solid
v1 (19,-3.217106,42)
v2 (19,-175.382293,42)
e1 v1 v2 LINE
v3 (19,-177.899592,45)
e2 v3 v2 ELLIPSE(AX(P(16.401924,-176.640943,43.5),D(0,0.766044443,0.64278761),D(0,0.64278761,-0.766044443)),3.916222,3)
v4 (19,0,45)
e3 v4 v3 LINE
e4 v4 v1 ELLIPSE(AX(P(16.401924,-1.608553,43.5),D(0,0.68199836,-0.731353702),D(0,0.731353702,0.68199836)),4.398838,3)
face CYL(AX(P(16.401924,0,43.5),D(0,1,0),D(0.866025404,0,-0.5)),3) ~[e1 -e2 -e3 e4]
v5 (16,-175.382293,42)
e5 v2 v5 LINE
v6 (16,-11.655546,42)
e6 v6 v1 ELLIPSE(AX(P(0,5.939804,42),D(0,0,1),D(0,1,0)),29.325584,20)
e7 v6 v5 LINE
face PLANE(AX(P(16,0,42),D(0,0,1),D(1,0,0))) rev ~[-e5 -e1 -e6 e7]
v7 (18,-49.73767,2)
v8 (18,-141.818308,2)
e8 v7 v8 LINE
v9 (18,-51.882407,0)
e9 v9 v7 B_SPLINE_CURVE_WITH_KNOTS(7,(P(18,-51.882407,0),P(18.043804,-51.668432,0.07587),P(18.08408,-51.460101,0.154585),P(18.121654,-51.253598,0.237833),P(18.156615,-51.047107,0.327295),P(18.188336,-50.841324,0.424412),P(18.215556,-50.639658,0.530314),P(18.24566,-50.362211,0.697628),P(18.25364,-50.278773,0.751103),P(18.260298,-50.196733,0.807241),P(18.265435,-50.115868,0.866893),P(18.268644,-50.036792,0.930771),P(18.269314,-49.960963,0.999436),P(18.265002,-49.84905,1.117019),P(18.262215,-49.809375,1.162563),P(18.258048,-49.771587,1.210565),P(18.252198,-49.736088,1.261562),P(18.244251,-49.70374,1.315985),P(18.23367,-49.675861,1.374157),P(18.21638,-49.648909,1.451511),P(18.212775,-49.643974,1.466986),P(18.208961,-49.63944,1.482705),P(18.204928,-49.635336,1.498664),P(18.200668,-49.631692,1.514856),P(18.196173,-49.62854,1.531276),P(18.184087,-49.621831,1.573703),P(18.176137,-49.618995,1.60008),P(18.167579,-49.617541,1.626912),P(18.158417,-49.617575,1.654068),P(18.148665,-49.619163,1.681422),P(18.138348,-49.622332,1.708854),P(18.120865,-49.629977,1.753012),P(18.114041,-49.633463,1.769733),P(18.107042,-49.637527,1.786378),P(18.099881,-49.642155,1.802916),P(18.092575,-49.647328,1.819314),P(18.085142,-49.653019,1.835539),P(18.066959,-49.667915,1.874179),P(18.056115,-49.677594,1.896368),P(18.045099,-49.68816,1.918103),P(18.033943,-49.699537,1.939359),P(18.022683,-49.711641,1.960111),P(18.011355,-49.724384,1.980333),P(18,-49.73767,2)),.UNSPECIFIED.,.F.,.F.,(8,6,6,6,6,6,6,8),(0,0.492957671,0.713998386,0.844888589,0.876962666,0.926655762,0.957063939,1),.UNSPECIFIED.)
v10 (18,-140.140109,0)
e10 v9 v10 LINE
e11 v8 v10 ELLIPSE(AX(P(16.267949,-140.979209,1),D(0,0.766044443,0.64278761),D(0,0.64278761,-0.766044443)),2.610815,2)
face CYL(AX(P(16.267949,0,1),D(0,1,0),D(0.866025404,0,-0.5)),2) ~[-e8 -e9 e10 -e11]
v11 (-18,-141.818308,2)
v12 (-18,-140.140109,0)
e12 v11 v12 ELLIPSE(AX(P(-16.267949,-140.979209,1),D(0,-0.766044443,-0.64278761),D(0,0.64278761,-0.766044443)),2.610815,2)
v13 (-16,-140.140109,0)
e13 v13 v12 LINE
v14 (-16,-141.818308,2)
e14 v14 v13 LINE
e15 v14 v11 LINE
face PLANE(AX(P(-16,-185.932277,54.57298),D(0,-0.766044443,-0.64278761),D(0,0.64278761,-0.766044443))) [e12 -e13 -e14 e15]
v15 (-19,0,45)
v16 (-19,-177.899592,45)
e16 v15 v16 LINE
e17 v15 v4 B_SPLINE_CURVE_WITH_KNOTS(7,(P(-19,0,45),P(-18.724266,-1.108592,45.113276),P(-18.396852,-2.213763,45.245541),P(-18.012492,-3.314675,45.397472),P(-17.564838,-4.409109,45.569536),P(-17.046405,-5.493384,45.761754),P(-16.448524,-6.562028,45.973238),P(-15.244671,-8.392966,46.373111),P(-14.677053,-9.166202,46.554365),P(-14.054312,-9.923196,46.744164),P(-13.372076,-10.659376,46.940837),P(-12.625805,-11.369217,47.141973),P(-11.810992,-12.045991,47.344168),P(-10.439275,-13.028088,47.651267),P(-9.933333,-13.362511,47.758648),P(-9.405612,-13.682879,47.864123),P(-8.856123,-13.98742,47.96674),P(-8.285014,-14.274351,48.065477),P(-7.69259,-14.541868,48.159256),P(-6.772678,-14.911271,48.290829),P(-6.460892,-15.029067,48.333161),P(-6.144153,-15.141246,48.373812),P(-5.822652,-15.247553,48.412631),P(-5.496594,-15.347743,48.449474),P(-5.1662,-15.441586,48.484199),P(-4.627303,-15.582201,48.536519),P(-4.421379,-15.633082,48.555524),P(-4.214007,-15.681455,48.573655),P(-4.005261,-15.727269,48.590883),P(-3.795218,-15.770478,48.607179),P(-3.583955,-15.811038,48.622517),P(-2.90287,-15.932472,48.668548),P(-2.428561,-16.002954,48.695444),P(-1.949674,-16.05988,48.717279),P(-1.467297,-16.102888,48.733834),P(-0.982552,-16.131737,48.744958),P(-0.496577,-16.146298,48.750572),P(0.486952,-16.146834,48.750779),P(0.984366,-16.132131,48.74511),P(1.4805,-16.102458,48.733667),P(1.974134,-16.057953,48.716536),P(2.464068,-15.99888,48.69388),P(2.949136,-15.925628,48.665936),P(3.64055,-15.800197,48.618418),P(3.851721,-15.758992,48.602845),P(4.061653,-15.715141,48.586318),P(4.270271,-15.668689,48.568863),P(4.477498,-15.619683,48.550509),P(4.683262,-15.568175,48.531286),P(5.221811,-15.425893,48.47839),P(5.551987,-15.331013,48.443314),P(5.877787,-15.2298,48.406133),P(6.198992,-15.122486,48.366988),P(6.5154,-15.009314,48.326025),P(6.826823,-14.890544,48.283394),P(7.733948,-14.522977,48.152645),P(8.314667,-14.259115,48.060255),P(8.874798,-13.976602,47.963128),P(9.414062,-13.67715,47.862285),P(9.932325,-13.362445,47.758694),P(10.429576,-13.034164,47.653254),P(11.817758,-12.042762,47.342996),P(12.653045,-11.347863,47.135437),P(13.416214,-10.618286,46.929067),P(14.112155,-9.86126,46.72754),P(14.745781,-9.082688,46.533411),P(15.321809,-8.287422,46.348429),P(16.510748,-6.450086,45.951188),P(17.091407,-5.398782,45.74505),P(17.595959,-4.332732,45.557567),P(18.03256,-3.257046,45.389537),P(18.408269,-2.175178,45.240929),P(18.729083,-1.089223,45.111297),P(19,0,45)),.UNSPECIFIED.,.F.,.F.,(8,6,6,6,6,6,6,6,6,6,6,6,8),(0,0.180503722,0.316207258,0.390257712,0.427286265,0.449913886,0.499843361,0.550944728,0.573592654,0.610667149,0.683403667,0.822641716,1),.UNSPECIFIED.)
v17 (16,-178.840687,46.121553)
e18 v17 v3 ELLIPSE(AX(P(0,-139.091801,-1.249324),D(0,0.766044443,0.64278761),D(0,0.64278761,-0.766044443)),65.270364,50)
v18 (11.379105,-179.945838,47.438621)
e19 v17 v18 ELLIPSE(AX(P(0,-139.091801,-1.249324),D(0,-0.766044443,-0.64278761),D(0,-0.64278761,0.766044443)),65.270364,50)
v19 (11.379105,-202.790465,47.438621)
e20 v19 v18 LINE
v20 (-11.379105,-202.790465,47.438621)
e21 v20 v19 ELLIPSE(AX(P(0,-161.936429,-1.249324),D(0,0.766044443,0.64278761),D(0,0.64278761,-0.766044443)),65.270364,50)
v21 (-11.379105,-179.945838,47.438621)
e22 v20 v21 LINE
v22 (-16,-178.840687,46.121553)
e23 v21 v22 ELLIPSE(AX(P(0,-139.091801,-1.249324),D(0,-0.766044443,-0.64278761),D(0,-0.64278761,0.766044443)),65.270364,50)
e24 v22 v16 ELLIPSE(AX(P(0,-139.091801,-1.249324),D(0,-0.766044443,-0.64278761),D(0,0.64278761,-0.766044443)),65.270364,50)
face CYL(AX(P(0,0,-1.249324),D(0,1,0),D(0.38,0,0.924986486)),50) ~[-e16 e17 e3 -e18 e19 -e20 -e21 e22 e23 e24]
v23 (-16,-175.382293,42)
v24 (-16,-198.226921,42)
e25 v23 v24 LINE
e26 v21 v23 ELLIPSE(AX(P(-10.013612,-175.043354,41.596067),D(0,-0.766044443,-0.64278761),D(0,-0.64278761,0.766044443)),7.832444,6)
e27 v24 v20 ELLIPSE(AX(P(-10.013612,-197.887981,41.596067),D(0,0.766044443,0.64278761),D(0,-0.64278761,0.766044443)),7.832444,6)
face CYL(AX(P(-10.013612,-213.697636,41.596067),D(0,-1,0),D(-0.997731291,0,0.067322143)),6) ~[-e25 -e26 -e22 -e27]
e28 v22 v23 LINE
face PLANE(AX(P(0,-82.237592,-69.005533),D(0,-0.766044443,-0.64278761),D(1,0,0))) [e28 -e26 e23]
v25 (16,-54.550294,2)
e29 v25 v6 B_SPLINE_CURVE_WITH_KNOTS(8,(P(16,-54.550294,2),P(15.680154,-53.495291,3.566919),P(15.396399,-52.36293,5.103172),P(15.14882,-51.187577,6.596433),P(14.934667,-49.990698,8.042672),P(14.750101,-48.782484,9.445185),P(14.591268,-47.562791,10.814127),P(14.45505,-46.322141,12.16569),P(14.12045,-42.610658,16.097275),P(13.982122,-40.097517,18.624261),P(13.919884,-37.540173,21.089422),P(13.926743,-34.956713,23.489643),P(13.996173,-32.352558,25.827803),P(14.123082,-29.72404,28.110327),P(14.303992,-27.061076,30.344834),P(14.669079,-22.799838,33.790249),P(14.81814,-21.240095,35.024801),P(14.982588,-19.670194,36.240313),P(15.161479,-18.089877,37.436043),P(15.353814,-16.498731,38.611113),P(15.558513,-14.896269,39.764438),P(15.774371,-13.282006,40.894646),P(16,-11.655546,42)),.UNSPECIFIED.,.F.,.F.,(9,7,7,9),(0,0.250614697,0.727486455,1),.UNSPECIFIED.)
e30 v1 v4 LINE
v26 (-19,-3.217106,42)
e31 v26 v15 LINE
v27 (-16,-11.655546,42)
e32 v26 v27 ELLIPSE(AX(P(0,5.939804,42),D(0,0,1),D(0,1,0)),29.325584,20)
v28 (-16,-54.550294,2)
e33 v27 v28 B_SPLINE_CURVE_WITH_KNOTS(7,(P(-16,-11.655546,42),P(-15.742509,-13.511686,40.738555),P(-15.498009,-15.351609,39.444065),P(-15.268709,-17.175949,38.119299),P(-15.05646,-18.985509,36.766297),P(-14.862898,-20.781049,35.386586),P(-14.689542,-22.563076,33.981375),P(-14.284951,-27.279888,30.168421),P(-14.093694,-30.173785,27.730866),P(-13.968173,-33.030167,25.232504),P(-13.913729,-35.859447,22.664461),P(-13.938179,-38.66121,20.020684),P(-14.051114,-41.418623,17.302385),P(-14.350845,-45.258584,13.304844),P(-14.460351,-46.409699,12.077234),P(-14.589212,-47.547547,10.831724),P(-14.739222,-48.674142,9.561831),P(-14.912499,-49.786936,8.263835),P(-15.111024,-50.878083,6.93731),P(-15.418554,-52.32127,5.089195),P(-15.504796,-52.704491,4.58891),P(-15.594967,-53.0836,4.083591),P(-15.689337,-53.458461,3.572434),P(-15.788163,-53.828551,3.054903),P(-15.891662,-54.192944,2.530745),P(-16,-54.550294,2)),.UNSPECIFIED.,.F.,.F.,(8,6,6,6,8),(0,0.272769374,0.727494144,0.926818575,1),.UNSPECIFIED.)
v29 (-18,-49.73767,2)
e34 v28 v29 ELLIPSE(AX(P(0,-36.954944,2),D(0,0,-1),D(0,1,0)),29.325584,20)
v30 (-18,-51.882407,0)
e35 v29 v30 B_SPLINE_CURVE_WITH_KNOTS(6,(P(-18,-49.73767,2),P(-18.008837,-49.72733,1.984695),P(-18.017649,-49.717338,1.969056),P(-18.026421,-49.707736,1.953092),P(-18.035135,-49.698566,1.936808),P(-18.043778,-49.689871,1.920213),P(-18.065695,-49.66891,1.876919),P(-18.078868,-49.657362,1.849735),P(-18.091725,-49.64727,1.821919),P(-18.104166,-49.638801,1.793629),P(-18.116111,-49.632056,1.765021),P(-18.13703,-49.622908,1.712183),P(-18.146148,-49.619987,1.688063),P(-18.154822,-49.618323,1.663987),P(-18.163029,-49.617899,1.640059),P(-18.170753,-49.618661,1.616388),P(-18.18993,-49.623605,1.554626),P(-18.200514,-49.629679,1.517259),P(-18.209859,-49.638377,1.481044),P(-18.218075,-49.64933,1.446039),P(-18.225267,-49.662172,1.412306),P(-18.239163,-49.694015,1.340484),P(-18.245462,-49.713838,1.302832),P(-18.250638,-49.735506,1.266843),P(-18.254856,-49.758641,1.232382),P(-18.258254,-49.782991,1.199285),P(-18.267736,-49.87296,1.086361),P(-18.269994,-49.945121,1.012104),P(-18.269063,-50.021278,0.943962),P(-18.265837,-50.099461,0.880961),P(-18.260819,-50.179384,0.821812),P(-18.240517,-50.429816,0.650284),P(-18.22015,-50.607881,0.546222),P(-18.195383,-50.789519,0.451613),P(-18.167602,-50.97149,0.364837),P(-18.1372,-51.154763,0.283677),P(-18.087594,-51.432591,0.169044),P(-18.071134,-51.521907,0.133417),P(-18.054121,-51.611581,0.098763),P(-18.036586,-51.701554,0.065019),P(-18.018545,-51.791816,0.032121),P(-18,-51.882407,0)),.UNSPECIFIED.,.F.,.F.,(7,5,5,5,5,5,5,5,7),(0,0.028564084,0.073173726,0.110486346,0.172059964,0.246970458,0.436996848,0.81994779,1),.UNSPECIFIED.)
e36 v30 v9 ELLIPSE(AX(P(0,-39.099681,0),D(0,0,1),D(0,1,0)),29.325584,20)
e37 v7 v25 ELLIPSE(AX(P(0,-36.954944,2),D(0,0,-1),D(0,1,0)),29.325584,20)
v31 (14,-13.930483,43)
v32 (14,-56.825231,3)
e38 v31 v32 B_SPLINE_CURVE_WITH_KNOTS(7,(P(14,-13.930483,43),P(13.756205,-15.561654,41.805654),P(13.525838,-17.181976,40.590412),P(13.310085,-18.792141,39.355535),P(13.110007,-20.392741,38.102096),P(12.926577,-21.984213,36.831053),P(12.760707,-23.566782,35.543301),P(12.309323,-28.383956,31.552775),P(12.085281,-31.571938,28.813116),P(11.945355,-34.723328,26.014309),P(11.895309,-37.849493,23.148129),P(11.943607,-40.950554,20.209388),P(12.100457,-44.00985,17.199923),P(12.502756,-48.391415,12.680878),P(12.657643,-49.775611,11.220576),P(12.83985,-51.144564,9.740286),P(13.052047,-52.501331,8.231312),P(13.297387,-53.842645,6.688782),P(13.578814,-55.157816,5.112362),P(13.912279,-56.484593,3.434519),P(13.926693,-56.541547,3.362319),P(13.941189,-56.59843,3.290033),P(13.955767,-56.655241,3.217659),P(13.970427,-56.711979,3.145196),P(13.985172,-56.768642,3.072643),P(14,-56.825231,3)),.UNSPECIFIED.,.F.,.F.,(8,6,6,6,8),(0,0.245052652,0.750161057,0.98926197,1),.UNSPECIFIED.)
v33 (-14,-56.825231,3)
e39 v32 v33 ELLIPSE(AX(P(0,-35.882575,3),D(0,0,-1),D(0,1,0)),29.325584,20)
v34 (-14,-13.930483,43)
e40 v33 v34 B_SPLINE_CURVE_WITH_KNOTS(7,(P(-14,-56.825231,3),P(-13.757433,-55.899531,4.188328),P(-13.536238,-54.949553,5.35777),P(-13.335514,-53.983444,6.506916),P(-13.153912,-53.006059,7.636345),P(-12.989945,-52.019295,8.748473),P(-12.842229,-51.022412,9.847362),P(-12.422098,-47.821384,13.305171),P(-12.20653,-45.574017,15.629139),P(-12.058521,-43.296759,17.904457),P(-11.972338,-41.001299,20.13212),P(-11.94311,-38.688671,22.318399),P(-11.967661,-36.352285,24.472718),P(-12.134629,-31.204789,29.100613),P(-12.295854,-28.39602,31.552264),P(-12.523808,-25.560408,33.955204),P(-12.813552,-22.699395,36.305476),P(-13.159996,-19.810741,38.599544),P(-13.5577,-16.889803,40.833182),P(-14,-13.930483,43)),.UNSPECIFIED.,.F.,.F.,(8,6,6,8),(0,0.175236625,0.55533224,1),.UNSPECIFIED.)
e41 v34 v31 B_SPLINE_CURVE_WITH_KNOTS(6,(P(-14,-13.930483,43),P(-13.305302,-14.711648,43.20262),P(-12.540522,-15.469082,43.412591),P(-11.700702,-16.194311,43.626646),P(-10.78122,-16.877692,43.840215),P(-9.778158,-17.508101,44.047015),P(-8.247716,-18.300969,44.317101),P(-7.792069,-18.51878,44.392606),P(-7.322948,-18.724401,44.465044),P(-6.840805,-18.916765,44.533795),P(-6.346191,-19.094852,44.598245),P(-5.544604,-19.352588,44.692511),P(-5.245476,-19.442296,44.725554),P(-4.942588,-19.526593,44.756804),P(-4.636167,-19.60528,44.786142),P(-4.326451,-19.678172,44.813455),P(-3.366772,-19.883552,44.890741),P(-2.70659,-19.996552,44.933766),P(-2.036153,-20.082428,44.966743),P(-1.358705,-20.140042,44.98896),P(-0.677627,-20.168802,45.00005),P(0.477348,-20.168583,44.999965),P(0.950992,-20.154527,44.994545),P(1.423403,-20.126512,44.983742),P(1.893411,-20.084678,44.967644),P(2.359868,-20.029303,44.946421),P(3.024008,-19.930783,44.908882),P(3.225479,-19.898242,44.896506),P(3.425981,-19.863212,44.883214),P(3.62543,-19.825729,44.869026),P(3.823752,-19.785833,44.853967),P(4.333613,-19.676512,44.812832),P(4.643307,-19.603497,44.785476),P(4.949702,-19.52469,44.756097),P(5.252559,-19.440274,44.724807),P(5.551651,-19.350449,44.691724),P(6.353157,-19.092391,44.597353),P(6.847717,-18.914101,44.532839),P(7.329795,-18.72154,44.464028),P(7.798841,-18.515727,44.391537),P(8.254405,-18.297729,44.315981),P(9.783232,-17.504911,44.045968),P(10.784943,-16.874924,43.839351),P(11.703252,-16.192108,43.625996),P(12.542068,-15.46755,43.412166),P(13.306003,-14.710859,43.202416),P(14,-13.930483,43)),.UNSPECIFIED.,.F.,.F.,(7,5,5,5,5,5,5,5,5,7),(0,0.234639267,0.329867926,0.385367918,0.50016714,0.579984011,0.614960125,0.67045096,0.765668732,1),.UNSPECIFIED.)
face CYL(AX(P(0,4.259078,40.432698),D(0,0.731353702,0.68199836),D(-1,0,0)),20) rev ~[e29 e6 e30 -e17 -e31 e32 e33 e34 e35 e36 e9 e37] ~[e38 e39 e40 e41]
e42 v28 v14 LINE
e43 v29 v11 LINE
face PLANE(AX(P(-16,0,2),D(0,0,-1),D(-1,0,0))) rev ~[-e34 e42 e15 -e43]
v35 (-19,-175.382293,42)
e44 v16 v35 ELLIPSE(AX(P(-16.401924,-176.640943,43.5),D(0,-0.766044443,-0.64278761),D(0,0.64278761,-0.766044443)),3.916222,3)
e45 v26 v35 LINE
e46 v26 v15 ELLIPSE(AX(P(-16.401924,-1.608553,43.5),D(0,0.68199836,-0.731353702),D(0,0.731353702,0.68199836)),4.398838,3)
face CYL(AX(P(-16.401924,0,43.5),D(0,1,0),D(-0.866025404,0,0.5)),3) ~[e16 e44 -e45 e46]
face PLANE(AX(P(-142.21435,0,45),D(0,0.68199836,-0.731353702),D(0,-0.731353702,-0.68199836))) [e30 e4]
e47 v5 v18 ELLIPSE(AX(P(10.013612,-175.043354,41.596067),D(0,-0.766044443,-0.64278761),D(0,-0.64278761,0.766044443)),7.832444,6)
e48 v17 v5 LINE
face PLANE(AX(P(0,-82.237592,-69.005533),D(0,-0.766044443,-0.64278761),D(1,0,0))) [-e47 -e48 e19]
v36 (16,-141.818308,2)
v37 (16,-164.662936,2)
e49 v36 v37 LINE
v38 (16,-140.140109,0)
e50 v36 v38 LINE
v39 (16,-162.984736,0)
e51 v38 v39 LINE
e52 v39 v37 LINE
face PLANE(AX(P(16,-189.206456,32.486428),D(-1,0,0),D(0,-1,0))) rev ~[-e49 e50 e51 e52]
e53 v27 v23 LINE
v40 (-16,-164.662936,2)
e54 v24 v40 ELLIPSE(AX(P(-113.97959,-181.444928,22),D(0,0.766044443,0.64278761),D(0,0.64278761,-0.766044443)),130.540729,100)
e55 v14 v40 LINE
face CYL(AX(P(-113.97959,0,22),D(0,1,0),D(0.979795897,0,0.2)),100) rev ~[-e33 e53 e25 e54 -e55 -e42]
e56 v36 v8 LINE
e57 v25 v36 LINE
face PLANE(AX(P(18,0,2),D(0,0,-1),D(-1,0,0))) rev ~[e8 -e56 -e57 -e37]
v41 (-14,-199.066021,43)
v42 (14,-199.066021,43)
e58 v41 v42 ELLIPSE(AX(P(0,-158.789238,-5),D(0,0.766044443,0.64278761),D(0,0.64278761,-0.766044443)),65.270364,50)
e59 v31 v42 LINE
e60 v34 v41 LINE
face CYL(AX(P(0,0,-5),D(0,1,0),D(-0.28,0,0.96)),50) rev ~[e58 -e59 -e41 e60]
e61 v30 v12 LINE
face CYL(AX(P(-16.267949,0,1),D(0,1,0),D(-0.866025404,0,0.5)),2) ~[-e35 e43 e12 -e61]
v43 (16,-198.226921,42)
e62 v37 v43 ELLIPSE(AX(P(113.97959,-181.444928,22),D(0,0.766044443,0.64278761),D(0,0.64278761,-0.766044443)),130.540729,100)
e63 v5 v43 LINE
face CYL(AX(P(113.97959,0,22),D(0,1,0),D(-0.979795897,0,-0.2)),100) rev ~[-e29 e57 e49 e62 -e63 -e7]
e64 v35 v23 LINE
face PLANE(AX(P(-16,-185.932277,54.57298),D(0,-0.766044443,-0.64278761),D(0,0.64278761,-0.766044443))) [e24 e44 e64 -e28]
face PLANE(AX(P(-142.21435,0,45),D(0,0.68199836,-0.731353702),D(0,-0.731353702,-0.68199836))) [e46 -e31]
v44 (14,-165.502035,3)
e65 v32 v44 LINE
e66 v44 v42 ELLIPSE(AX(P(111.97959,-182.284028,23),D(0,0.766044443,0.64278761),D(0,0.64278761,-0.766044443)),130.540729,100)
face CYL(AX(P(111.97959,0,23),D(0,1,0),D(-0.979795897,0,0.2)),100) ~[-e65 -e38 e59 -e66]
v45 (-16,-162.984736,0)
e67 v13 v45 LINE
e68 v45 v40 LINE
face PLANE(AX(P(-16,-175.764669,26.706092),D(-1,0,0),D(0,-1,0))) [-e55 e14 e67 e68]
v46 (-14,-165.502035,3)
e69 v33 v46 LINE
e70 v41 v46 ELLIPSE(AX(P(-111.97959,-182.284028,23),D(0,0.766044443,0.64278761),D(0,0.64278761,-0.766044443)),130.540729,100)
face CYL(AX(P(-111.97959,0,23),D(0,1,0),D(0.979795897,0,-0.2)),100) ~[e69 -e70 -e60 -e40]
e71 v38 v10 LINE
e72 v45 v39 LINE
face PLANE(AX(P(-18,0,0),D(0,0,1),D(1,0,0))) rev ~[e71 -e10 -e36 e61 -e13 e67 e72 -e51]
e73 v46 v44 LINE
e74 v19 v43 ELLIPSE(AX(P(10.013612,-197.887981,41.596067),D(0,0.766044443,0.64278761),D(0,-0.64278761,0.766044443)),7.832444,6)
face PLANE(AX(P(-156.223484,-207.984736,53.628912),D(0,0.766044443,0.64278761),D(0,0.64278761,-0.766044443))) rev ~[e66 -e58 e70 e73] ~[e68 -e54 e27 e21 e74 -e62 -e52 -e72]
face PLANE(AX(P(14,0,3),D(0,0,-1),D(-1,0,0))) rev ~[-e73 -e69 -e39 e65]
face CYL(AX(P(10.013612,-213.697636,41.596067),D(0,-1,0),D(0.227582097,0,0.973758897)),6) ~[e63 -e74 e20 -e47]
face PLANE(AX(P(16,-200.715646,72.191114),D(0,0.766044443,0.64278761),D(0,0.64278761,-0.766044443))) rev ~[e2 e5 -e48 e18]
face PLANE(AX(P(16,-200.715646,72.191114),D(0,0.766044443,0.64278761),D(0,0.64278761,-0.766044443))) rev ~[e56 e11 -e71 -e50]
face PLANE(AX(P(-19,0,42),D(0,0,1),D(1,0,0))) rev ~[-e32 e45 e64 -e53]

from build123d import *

# Parameters (mm, degrees)
F1_DEPTH       = 207.9847365
F2_T1_DEPTH    = 312.4469684912
F3_T1_DEPTH    = 284.4287008275
F6_START       = -2
F6_DEPTH       = 4
F9_START       = 2
F9_DEPTH       = 4
F11_R          = 20
F12_DEPTH      = 90
F12_DEPTH_BACK = 5
F13_T4_DEPTH   = 46.8692709023
F13_T9_DEPTH   = 46.8692709023


# Not quite as in the source:
# - a fillet or chamfer that OpenCascade refuses, or shapes differently, is made with other operations: its cross-section is extruded or revolved along the edge and cut away or added


with BuildPart() as f1:
    # F0 (on Front) → F1 (new body)
    with BuildSketch(Plane.XZ):
        with BuildLine():
            Line((-18, 0), (0, 0))
            Line((0, 0), (18, 0))
            ThreePointArc((18, 0), (18.2679491924, 1), (18, 2))
            Line((18, 2), (16, 2))
            ThreePointArc((16, 2), (13.9795897113, 22), (16, 42))
            Line((16, 42), (19, 42))
            ThreePointArc((19, 42), (19.4019237886, 43.5), (19, 45))
            ThreePointArc((19, 45), (0, 48.7506756806), (-19, 45))
            ThreePointArc((-19, 45), (-19.4019237886, 43.5), (-19, 42))
            Line((-19, 42), (-16, 42))
            ThreePointArc((-16, 42), (-13.9795897113, 22), (-16, 2))
            Line((-16, 2), (-18, 2))
            ThreePointArc((-18, 2), (-18.2679491924, 1), (-18, 0))
        make_face()
        with BuildLine():
            Line((14, 3), (0, 3))
            Line((0, 3), (-14, 3))
            ThreePointArc((-14, 3), (-11.9795897113, 23), (-14, 43))
            ThreePointArc((-14, 43), (0, 45), (14, 43))
            ThreePointArc((14, 43), (11.9795897113, 23), (14, 3))
        make_face(mode=Mode.SUBTRACT)
    extrude(amount=F1_DEPTH)

    # F2: chamfer of 45 x 53.6289116667 on 1 edges, made by hand

    # F2_s2 → F2_t1 (cut)
    with BuildSketch(Plane.YZ.offset(-156.2234842456)):
        Polygon((-207.9847365, 53.6289116667), (-162.9847365, 0), (-207.9847365, 0), align=None)
    extrude(amount=F2_T1_DEPTH, mode=Mode.SUBTRACT)

    # F3: chamfer of 45 x 48.2565919511 on 1 edges, made by hand

    # F3_s2 → F3_t1 (cut)
    with BuildSketch(Plane.YZ.offset(-142.2143504137)):
        Polygon((0, 45), (-48.2565919511, 0), (0, 0), align=None)
    extrude(amount=F3_T1_DEPTH, mode=Mode.SUBTRACT)

    # F5 (on face) → F6 (cut)
    with BuildSketch(Plane(origin=(14, 0, 0), x_dir=(0, -1, 0), z_dir=(-1, 0, 0)).offset(F6_START)):
        Polygon((200.7156460232, 72.1911139462), (140.1401089367, 0), (198.049341578, 0), (232.2688040982, 72.1911139462), align=None)
    extrude(amount=-F6_DEPTH, mode=Mode.SUBTRACT)

    # F8 (on face) → F9 (cut)
    with BuildSketch(Plane(origin=(-14, 0, 0), x_dir=(0, -1, 0), z_dir=(-1, 0, 0)).offset(F9_START)):
        Polygon((185.9322765967, 54.5729803215), (140.1401089367, 0), (168.9397689519, 0), (210.618345394, 54.5729803215), align=None)
    extrude(amount=F9_DEPTH, mode=Mode.SUBTRACT)

    # F11 (on face) → F12 (cut, two sides)
    with BuildSketch(Plane(origin=(0, 22.4451911308, 20.9304793408), x_dir=(-1, 0, 0), z_dir=(0, 0.7313537016, 0.6819983601))) as f12_sk:
        with Locations((0, 26.6659185749)):
            Circle(F11_R)
    extrude(amount=-F12_DEPTH, mode=Mode.SUBTRACT)
    extrude(f12_sk.sketch, amount=F12_DEPTH_BACK, mode=Mode.SUBTRACT)

    # F13: fillet of radius 6 on 2 edges, made by hand


with BuildPart() as f13_tool2:
    # F13_s3 → F13_t4 (new body)
    with BuildSketch(Plane.XZ.offset(213.6976361216)):
        with BuildLine():
            ThreePointArc((11.3791048339, 47.4386205251), (14.5860497205, 45.4810144553), (16, 42))
            Line((16, 42), (16, 46.1215528099))
            ThreePointArc((16, 46.1215528099), (13.7053826002, 46.8356264218), (11.3791048339, 47.4386205251))
        make_face()
    extrude(amount=-F13_T4_DEPTH)

    split(bisect_by=Plane(origin=(0, -82.2375917358, -69.0055328944), x_dir=(1, 0, 0), z_dir=(0, -0.7660444431, -0.6427876097)), keep=Keep.TOP)


with BuildPart() as f1_1:
    add(f1.part)

    # F13_t1: cut F13_tool2
    add(f13_tool2.part, mode=Mode.SUBTRACT)


with BuildPart() as f13_tool7:
    # F13_s8 → F13_t9 (new body)
    with BuildSketch(Plane.XZ.offset(213.6976361216)):
        with BuildLine():
            ThreePointArc((-16, 42), (-14.5860497205, 45.4810144553), (-11.3791048339, 47.4386205251))
            ThreePointArc((-11.3791048339, 47.4386205251), (-13.7053826002, 46.8356264218), (-16, 46.1215528099))
            Line((-16, 46.1215528099), (-16, 42))
        make_face()
    extrude(amount=-F13_T9_DEPTH)

    split(bisect_by=Plane(origin=(0, -82.2375917358, -69.0055328944), x_dir=(1, 0, 0), z_dir=(0, -0.7660444431, -0.6427876097)), keep=Keep.TOP)


with BuildPart() as f1_2:
    add(f1_1.part)

    # F13_t6: cut F13_tool7
    add(f13_tool7.part, mode=Mode.SUBTRACT)


solid = f1_2.part
